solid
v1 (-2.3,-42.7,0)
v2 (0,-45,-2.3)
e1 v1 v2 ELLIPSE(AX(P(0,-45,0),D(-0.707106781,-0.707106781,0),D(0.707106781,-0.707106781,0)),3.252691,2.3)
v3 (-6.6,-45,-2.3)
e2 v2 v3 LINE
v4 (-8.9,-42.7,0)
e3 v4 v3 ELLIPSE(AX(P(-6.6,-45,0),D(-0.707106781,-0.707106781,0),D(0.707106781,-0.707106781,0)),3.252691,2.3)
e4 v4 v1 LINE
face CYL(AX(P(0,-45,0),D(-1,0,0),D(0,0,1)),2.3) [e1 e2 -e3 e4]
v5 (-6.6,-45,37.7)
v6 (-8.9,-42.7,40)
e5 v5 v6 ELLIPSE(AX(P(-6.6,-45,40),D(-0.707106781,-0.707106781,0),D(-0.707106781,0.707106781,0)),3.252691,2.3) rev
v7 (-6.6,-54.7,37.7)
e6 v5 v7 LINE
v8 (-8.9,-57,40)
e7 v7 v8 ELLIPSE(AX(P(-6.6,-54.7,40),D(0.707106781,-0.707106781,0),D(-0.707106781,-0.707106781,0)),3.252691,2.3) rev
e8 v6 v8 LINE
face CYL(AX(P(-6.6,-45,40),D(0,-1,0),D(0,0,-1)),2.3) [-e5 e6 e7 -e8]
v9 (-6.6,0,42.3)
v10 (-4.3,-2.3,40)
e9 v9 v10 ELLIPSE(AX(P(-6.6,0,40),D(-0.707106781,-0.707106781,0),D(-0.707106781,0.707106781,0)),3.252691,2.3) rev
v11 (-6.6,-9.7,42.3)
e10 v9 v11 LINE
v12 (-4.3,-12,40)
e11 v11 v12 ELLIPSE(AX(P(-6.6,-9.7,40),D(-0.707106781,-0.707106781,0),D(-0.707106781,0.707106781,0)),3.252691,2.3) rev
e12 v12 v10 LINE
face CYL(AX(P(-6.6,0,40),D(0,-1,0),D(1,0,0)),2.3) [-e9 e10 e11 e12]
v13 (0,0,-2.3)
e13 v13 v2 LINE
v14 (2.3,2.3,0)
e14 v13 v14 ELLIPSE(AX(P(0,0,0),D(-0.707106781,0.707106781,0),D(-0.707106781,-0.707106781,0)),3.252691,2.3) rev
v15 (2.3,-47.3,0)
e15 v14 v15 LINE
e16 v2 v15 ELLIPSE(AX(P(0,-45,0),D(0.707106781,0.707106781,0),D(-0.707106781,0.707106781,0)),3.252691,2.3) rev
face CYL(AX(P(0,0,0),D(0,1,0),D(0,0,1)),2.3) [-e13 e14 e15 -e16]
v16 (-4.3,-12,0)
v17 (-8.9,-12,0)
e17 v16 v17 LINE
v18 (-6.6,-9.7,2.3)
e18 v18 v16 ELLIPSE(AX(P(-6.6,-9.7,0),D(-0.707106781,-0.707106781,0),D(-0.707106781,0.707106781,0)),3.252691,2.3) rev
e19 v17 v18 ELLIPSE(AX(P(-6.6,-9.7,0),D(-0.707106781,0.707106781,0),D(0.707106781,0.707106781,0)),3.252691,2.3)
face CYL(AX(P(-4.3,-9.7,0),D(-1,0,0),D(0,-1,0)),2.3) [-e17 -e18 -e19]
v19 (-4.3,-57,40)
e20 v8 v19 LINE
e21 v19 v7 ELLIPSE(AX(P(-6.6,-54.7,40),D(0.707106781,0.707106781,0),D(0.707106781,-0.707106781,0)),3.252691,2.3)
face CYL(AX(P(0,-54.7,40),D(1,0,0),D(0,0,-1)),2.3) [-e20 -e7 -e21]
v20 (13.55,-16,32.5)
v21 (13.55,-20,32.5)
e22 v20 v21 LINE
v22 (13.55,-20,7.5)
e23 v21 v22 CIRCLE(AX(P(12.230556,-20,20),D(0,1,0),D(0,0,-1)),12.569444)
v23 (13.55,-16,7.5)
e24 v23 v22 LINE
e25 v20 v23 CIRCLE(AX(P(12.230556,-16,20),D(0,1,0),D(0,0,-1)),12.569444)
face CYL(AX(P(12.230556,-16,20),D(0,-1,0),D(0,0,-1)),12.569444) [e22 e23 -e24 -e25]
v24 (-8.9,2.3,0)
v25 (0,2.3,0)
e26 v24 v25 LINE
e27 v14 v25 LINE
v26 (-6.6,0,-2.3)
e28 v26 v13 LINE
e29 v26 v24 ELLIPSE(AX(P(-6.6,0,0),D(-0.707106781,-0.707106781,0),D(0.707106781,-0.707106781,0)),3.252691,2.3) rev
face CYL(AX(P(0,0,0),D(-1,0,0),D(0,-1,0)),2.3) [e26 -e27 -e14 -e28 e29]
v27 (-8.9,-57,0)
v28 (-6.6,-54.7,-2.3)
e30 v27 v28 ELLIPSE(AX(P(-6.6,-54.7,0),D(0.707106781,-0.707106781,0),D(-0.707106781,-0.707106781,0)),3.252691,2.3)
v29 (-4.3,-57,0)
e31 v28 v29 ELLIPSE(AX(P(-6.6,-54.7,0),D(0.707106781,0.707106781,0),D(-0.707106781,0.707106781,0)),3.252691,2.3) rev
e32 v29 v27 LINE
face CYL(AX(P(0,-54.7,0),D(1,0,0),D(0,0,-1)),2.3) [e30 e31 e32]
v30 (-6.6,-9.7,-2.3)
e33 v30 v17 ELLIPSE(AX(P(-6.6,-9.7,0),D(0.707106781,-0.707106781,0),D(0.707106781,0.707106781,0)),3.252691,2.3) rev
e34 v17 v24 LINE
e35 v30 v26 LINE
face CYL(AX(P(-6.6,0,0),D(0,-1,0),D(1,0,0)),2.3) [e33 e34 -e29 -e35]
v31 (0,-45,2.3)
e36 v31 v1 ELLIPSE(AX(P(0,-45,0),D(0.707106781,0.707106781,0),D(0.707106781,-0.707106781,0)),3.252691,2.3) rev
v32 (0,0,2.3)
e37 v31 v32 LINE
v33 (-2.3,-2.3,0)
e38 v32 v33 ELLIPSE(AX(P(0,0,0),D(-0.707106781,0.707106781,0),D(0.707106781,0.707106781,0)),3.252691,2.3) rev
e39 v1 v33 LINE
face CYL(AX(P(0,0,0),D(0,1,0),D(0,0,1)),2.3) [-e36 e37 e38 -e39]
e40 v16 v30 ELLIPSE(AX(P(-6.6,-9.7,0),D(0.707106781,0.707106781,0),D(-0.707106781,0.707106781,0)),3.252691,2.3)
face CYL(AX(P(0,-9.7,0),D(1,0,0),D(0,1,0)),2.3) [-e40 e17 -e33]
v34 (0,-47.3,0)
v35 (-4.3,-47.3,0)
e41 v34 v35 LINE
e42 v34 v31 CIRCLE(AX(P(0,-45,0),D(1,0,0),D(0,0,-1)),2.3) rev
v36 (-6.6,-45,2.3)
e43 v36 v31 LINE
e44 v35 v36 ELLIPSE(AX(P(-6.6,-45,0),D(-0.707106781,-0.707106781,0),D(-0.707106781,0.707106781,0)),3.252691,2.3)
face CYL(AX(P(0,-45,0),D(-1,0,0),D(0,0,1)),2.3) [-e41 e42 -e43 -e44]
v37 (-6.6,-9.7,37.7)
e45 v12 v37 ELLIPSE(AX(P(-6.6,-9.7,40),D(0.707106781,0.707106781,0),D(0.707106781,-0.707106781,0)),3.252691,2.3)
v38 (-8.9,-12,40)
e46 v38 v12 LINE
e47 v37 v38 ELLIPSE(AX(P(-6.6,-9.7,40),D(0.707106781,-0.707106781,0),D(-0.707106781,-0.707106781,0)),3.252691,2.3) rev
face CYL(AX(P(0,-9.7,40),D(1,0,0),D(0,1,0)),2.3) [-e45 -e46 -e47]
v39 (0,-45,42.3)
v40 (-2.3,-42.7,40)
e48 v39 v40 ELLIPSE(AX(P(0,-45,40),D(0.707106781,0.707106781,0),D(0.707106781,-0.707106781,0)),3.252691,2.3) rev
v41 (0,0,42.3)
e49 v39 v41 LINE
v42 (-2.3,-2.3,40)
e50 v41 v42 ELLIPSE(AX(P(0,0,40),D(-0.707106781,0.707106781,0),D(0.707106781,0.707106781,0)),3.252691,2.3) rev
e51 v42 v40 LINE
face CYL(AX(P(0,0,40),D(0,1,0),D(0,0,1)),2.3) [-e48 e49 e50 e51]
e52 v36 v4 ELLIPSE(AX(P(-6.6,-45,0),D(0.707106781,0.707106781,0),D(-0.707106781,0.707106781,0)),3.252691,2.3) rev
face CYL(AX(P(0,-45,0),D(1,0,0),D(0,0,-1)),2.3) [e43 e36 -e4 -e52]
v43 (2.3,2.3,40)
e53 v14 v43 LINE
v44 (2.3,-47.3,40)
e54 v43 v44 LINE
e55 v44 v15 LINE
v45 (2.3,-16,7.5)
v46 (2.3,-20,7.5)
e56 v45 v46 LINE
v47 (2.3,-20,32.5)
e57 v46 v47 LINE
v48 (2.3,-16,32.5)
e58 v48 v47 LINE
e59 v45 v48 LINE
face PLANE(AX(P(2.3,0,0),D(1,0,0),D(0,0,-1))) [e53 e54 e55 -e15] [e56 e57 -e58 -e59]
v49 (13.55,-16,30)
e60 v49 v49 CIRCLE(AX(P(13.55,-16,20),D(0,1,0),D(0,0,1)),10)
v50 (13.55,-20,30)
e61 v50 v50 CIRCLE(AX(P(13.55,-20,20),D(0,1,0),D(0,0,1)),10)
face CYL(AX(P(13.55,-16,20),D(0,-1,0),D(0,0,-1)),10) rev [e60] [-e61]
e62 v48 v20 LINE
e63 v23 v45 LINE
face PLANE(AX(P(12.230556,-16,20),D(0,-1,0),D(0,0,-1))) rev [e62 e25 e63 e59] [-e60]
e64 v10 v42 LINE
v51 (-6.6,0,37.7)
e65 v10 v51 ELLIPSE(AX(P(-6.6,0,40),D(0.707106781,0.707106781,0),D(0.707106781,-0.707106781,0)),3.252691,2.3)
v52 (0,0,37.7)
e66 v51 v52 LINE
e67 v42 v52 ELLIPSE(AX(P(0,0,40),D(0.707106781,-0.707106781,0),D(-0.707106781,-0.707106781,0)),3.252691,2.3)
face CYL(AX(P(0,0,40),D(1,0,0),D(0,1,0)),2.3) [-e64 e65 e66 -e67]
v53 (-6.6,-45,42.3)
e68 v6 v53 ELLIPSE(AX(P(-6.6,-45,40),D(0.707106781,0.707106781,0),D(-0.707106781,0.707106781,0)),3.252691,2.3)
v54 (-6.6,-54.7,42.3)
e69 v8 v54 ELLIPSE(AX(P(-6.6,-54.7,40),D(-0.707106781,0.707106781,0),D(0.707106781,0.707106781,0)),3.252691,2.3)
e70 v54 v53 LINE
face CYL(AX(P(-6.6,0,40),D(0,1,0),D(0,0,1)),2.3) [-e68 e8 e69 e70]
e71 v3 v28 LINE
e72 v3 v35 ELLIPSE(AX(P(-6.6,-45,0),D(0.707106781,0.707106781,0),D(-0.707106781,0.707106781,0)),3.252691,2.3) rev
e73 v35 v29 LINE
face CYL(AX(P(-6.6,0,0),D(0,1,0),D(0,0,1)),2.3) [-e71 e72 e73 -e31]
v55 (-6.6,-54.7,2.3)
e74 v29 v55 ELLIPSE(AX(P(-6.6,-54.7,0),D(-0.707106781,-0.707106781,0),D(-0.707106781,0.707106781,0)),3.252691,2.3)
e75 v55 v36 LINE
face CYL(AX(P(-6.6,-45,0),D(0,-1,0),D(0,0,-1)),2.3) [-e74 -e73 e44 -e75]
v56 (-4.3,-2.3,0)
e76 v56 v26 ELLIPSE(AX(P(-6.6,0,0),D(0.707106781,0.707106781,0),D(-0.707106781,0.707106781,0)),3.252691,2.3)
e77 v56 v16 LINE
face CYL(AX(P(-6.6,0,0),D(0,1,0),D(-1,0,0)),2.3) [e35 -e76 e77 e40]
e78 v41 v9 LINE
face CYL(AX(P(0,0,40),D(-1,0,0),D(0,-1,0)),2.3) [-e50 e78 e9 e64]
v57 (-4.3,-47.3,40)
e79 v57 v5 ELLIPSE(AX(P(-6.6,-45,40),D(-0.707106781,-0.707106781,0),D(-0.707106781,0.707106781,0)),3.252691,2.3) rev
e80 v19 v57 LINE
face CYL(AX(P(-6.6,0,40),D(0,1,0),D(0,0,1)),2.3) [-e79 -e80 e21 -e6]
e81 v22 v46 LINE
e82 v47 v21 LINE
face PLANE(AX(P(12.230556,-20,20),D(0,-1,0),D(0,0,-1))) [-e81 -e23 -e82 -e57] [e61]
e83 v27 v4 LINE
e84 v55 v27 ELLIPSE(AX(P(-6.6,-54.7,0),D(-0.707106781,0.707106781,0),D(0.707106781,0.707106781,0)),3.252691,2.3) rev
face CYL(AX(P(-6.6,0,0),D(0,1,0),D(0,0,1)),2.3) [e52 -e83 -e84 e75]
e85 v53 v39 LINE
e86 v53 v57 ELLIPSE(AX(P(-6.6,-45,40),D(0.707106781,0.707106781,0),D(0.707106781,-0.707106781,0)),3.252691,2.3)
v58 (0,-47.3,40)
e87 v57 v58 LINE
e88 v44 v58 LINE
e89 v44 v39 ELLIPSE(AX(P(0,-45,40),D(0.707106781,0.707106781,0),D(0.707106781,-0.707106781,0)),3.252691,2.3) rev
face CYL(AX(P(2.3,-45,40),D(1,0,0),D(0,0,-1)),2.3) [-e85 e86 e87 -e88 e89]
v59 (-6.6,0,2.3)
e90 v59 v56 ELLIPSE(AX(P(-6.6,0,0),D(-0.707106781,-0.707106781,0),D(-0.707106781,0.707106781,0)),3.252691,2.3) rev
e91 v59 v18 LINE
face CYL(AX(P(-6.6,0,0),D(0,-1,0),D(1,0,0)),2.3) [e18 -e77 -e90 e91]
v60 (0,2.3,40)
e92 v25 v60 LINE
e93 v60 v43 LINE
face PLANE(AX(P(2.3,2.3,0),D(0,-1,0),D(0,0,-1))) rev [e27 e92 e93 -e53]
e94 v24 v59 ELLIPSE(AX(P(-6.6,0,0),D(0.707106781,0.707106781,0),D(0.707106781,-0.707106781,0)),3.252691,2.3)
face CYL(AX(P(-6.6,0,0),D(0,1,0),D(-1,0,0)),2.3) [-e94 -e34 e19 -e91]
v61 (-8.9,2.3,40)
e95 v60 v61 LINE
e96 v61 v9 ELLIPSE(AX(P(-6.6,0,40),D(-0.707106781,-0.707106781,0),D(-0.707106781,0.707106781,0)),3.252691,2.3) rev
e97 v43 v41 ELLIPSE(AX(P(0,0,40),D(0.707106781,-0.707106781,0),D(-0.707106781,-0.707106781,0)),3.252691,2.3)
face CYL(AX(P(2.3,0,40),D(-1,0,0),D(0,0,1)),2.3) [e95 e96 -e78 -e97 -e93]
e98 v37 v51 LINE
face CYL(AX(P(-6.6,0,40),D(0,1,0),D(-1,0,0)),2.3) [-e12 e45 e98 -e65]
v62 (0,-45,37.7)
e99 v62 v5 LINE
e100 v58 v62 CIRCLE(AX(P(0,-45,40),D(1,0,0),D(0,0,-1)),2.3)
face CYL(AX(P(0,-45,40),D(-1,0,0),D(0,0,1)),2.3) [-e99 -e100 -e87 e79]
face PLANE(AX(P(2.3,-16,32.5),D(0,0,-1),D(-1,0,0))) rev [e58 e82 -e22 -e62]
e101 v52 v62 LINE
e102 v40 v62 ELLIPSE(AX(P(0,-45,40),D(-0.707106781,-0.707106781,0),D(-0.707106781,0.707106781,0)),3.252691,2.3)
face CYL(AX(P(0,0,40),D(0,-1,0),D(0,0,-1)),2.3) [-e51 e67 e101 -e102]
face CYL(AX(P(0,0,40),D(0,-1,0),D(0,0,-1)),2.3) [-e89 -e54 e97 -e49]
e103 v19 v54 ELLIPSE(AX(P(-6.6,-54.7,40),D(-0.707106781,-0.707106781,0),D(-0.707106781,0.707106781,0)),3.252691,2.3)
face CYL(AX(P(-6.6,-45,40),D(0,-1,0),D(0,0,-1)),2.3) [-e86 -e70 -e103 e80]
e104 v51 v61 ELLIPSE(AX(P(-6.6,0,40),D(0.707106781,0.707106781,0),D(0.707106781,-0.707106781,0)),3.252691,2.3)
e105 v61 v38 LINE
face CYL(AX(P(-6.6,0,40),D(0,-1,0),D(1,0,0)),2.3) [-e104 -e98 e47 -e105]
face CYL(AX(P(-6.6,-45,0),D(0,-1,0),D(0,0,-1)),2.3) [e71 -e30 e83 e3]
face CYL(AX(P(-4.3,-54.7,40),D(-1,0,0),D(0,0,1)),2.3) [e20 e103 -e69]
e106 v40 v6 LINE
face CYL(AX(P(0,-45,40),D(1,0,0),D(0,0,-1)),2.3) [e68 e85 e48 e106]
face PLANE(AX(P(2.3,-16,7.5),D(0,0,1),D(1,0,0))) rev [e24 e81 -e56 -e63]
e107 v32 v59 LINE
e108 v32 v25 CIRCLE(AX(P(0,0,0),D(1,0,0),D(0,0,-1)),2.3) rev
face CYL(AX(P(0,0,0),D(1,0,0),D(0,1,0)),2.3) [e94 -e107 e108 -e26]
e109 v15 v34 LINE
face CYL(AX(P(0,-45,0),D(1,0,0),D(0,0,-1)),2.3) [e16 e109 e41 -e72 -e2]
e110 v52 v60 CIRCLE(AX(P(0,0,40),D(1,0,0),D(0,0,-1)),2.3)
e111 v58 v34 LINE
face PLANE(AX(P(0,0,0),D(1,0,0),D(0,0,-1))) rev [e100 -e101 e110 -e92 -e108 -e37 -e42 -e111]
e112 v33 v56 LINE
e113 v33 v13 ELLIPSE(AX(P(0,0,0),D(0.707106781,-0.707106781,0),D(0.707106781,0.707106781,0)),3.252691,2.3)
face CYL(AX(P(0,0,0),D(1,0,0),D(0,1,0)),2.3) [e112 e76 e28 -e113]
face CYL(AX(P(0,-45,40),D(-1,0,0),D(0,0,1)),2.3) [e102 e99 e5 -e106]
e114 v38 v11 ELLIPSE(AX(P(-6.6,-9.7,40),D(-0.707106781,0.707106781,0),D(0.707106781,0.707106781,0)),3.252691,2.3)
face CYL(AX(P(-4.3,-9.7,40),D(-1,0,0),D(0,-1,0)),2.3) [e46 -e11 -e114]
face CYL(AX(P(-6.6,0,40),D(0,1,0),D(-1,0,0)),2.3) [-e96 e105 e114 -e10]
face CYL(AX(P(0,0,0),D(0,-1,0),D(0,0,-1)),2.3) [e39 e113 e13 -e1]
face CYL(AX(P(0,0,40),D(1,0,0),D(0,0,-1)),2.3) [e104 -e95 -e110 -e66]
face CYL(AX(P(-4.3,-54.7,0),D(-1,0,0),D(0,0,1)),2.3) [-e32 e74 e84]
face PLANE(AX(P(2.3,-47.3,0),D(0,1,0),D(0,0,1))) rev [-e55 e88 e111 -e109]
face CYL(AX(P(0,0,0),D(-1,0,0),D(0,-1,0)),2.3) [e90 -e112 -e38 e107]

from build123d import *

# Parameters (mm, degrees)
EXTRU_MINCE1_DEPTH         = 2.3
CONG_1_R                   = 2.3
ESQUISSE2_W                = 40
ESQUISSE2_H                = 49.6
BOSS_EXTRU_1_DEPTH         = 2.3
R_P_TITION_LIN_AIRE1_COUNT = 2
R_P_TITION_LIN_AIRE1_PITCH = 40
CONG_2_R                   = 2.3
BOSS_EXTRU_2_START         = -20
ESQUISSE3_R                = 10
BOSS_EXTRU_2_DEPTH         = 4


with BuildPart() as part:
    # Esquisse1 → Extru.-Mince1 (new, symmetric)
    with BuildSketch(Plane.XY):
        Polygon((-4.3, -57), (-4.3, -47.3), (2.3, -47.3), (2.3, 2.3), (-8.9, 2.3), (-8.9, -12), (-4.3, -12), (-4.3, -2.3), (-2.3, -2.3), (-2.3, -42.7), (-8.9, -42.7), (-8.9, -57), align=None)
    extru_mince1 = extrude(amount=EXTRU_MINCE1_DEPTH, both=True)

    # Congé1
    cong_1_edges = [part.edges().sort_by_distance(p)[0] for p in [
        (-6.6, -57, -2.3),
        (-4.3, -52.15, -2.3),
        (-1, -47.3, -2.3),
        (2.3, -22.5, -2.3),
        (-3.3, 2.3, -2.3),
        (-8.9, -4.85, -2.3),
        (-6.6, -12, -2.3),
        (-4.3, -7.15, -2.3),
        (-3.3, -2.3, -2.3),
        (-2.3, -22.5, -2.3),
        (-5.6, -42.7, -2.3),
        (-8.9, -49.85, -2.3),
        (-5.6, -42.7, 2.3),
        (-2.3, -22.5, 2.3),
        (-3.3, -2.3, 2.3),
        (-4.3, -7.15, 2.3),
        (-6.6, -12, 2.3),
        (-8.9, -4.85, 2.3),
        (-3.3, 2.3, 2.3),
        (2.3, -22.5, 2.3),
        (-1, -47.3, 2.3),
        (-4.3, -52.15, 2.3),
        (-6.6, -57, 2.3),
        (-8.9, -49.85, 2.3),
    ]]
    fillet(cong_1_edges, radius=CONG_1_R - 0.0001)  # a hair under: the kernel refuses the full size

    # Esquisse2 → Boss.-Extru.1 (add)
    with BuildSketch(Plane(origin=(0, 0, 0), x_dir=(0, 0, -1), z_dir=(1, 0, 0))):
        with Locations((-20, -22.5)):
            Rectangle(ESQUISSE2_W, ESQUISSE2_H)
    extrude(amount=BOSS_EXTRU_1_DEPTH)

    # Répétition linéaire1: Extru.-Mince1 ×2
    with Locations(*[(0, 0, i * R_P_TITION_LIN_AIRE1_PITCH) for i in range(1, R_P_TITION_LIN_AIRE1_COUNT)]):
        add(extru_mince1)

    # Congé2
    cong_2_edges = [part.edges().sort_by_distance(p)[0] for p in [
        (-5.6, -42.7, 42.3),
        (-2.3, -22.5, 42.3),
        (-3.3, -2.3, 42.3),
        (-4.3, -7.15, 42.3),
        (-6.6, -12, 42.3),
        (-8.9, -4.85, 42.3),
        (-3.3, 2.3, 42.3),
        (2.3, -22.5, 42.3),
        (-6.6, -57, 42.3),
        (-4.3, -52.15, 42.3),
        (-1, -47.3, 42.3),
        (-8.9, -49.85, 42.3),
        (-2.15, -47.3, 37.7),
        (-4.3, -52.15, 37.7),
        (-6.6, -57, 37.7),
        (-8.9, -49.85, 37.7),
        (-5.6, -42.7, 37.7),
        (-2.3, -22.5, 37.7),
        (-3.3, -2.3, 37.7),
        (-4.3, -7.15, 37.7),
        (-6.6, -12, 37.7),
        (-8.9, -4.85, 37.7),
        (-4.45, 2.3, 37.7),
    ]]
    fillet(cong_2_edges, radius=CONG_2_R - 0.0001)  # a hair under: the kernel refuses the full size

    # Esquisse3 → Boss.-Extru.2 (add)
    with BuildSketch(Plane(origin=(0, 0, 0), x_dir=(1, 0, 0), z_dir=(0, 1, 0)).offset(BOSS_EXTRU_2_START)):
        with BuildLine():
            Line((2.3, -7.5), (13.55, -7.5))
            ThreePointArc((13.55, -7.5), (24.8, -20), (13.55, -32.5))
            Line((13.55, -32.5), (2.3, -32.5))
            Line((2.3, -32.5), (2.3, -7.5))
        make_face()
        with Locations(Location((13.55, -20, 0), (0, 0, 270))):
            Circle(ESQUISSE3_R, mode=Mode.SUBTRACT)
    extrude(amount=BOSS_EXTRU_2_DEPTH)


solid = part.part
